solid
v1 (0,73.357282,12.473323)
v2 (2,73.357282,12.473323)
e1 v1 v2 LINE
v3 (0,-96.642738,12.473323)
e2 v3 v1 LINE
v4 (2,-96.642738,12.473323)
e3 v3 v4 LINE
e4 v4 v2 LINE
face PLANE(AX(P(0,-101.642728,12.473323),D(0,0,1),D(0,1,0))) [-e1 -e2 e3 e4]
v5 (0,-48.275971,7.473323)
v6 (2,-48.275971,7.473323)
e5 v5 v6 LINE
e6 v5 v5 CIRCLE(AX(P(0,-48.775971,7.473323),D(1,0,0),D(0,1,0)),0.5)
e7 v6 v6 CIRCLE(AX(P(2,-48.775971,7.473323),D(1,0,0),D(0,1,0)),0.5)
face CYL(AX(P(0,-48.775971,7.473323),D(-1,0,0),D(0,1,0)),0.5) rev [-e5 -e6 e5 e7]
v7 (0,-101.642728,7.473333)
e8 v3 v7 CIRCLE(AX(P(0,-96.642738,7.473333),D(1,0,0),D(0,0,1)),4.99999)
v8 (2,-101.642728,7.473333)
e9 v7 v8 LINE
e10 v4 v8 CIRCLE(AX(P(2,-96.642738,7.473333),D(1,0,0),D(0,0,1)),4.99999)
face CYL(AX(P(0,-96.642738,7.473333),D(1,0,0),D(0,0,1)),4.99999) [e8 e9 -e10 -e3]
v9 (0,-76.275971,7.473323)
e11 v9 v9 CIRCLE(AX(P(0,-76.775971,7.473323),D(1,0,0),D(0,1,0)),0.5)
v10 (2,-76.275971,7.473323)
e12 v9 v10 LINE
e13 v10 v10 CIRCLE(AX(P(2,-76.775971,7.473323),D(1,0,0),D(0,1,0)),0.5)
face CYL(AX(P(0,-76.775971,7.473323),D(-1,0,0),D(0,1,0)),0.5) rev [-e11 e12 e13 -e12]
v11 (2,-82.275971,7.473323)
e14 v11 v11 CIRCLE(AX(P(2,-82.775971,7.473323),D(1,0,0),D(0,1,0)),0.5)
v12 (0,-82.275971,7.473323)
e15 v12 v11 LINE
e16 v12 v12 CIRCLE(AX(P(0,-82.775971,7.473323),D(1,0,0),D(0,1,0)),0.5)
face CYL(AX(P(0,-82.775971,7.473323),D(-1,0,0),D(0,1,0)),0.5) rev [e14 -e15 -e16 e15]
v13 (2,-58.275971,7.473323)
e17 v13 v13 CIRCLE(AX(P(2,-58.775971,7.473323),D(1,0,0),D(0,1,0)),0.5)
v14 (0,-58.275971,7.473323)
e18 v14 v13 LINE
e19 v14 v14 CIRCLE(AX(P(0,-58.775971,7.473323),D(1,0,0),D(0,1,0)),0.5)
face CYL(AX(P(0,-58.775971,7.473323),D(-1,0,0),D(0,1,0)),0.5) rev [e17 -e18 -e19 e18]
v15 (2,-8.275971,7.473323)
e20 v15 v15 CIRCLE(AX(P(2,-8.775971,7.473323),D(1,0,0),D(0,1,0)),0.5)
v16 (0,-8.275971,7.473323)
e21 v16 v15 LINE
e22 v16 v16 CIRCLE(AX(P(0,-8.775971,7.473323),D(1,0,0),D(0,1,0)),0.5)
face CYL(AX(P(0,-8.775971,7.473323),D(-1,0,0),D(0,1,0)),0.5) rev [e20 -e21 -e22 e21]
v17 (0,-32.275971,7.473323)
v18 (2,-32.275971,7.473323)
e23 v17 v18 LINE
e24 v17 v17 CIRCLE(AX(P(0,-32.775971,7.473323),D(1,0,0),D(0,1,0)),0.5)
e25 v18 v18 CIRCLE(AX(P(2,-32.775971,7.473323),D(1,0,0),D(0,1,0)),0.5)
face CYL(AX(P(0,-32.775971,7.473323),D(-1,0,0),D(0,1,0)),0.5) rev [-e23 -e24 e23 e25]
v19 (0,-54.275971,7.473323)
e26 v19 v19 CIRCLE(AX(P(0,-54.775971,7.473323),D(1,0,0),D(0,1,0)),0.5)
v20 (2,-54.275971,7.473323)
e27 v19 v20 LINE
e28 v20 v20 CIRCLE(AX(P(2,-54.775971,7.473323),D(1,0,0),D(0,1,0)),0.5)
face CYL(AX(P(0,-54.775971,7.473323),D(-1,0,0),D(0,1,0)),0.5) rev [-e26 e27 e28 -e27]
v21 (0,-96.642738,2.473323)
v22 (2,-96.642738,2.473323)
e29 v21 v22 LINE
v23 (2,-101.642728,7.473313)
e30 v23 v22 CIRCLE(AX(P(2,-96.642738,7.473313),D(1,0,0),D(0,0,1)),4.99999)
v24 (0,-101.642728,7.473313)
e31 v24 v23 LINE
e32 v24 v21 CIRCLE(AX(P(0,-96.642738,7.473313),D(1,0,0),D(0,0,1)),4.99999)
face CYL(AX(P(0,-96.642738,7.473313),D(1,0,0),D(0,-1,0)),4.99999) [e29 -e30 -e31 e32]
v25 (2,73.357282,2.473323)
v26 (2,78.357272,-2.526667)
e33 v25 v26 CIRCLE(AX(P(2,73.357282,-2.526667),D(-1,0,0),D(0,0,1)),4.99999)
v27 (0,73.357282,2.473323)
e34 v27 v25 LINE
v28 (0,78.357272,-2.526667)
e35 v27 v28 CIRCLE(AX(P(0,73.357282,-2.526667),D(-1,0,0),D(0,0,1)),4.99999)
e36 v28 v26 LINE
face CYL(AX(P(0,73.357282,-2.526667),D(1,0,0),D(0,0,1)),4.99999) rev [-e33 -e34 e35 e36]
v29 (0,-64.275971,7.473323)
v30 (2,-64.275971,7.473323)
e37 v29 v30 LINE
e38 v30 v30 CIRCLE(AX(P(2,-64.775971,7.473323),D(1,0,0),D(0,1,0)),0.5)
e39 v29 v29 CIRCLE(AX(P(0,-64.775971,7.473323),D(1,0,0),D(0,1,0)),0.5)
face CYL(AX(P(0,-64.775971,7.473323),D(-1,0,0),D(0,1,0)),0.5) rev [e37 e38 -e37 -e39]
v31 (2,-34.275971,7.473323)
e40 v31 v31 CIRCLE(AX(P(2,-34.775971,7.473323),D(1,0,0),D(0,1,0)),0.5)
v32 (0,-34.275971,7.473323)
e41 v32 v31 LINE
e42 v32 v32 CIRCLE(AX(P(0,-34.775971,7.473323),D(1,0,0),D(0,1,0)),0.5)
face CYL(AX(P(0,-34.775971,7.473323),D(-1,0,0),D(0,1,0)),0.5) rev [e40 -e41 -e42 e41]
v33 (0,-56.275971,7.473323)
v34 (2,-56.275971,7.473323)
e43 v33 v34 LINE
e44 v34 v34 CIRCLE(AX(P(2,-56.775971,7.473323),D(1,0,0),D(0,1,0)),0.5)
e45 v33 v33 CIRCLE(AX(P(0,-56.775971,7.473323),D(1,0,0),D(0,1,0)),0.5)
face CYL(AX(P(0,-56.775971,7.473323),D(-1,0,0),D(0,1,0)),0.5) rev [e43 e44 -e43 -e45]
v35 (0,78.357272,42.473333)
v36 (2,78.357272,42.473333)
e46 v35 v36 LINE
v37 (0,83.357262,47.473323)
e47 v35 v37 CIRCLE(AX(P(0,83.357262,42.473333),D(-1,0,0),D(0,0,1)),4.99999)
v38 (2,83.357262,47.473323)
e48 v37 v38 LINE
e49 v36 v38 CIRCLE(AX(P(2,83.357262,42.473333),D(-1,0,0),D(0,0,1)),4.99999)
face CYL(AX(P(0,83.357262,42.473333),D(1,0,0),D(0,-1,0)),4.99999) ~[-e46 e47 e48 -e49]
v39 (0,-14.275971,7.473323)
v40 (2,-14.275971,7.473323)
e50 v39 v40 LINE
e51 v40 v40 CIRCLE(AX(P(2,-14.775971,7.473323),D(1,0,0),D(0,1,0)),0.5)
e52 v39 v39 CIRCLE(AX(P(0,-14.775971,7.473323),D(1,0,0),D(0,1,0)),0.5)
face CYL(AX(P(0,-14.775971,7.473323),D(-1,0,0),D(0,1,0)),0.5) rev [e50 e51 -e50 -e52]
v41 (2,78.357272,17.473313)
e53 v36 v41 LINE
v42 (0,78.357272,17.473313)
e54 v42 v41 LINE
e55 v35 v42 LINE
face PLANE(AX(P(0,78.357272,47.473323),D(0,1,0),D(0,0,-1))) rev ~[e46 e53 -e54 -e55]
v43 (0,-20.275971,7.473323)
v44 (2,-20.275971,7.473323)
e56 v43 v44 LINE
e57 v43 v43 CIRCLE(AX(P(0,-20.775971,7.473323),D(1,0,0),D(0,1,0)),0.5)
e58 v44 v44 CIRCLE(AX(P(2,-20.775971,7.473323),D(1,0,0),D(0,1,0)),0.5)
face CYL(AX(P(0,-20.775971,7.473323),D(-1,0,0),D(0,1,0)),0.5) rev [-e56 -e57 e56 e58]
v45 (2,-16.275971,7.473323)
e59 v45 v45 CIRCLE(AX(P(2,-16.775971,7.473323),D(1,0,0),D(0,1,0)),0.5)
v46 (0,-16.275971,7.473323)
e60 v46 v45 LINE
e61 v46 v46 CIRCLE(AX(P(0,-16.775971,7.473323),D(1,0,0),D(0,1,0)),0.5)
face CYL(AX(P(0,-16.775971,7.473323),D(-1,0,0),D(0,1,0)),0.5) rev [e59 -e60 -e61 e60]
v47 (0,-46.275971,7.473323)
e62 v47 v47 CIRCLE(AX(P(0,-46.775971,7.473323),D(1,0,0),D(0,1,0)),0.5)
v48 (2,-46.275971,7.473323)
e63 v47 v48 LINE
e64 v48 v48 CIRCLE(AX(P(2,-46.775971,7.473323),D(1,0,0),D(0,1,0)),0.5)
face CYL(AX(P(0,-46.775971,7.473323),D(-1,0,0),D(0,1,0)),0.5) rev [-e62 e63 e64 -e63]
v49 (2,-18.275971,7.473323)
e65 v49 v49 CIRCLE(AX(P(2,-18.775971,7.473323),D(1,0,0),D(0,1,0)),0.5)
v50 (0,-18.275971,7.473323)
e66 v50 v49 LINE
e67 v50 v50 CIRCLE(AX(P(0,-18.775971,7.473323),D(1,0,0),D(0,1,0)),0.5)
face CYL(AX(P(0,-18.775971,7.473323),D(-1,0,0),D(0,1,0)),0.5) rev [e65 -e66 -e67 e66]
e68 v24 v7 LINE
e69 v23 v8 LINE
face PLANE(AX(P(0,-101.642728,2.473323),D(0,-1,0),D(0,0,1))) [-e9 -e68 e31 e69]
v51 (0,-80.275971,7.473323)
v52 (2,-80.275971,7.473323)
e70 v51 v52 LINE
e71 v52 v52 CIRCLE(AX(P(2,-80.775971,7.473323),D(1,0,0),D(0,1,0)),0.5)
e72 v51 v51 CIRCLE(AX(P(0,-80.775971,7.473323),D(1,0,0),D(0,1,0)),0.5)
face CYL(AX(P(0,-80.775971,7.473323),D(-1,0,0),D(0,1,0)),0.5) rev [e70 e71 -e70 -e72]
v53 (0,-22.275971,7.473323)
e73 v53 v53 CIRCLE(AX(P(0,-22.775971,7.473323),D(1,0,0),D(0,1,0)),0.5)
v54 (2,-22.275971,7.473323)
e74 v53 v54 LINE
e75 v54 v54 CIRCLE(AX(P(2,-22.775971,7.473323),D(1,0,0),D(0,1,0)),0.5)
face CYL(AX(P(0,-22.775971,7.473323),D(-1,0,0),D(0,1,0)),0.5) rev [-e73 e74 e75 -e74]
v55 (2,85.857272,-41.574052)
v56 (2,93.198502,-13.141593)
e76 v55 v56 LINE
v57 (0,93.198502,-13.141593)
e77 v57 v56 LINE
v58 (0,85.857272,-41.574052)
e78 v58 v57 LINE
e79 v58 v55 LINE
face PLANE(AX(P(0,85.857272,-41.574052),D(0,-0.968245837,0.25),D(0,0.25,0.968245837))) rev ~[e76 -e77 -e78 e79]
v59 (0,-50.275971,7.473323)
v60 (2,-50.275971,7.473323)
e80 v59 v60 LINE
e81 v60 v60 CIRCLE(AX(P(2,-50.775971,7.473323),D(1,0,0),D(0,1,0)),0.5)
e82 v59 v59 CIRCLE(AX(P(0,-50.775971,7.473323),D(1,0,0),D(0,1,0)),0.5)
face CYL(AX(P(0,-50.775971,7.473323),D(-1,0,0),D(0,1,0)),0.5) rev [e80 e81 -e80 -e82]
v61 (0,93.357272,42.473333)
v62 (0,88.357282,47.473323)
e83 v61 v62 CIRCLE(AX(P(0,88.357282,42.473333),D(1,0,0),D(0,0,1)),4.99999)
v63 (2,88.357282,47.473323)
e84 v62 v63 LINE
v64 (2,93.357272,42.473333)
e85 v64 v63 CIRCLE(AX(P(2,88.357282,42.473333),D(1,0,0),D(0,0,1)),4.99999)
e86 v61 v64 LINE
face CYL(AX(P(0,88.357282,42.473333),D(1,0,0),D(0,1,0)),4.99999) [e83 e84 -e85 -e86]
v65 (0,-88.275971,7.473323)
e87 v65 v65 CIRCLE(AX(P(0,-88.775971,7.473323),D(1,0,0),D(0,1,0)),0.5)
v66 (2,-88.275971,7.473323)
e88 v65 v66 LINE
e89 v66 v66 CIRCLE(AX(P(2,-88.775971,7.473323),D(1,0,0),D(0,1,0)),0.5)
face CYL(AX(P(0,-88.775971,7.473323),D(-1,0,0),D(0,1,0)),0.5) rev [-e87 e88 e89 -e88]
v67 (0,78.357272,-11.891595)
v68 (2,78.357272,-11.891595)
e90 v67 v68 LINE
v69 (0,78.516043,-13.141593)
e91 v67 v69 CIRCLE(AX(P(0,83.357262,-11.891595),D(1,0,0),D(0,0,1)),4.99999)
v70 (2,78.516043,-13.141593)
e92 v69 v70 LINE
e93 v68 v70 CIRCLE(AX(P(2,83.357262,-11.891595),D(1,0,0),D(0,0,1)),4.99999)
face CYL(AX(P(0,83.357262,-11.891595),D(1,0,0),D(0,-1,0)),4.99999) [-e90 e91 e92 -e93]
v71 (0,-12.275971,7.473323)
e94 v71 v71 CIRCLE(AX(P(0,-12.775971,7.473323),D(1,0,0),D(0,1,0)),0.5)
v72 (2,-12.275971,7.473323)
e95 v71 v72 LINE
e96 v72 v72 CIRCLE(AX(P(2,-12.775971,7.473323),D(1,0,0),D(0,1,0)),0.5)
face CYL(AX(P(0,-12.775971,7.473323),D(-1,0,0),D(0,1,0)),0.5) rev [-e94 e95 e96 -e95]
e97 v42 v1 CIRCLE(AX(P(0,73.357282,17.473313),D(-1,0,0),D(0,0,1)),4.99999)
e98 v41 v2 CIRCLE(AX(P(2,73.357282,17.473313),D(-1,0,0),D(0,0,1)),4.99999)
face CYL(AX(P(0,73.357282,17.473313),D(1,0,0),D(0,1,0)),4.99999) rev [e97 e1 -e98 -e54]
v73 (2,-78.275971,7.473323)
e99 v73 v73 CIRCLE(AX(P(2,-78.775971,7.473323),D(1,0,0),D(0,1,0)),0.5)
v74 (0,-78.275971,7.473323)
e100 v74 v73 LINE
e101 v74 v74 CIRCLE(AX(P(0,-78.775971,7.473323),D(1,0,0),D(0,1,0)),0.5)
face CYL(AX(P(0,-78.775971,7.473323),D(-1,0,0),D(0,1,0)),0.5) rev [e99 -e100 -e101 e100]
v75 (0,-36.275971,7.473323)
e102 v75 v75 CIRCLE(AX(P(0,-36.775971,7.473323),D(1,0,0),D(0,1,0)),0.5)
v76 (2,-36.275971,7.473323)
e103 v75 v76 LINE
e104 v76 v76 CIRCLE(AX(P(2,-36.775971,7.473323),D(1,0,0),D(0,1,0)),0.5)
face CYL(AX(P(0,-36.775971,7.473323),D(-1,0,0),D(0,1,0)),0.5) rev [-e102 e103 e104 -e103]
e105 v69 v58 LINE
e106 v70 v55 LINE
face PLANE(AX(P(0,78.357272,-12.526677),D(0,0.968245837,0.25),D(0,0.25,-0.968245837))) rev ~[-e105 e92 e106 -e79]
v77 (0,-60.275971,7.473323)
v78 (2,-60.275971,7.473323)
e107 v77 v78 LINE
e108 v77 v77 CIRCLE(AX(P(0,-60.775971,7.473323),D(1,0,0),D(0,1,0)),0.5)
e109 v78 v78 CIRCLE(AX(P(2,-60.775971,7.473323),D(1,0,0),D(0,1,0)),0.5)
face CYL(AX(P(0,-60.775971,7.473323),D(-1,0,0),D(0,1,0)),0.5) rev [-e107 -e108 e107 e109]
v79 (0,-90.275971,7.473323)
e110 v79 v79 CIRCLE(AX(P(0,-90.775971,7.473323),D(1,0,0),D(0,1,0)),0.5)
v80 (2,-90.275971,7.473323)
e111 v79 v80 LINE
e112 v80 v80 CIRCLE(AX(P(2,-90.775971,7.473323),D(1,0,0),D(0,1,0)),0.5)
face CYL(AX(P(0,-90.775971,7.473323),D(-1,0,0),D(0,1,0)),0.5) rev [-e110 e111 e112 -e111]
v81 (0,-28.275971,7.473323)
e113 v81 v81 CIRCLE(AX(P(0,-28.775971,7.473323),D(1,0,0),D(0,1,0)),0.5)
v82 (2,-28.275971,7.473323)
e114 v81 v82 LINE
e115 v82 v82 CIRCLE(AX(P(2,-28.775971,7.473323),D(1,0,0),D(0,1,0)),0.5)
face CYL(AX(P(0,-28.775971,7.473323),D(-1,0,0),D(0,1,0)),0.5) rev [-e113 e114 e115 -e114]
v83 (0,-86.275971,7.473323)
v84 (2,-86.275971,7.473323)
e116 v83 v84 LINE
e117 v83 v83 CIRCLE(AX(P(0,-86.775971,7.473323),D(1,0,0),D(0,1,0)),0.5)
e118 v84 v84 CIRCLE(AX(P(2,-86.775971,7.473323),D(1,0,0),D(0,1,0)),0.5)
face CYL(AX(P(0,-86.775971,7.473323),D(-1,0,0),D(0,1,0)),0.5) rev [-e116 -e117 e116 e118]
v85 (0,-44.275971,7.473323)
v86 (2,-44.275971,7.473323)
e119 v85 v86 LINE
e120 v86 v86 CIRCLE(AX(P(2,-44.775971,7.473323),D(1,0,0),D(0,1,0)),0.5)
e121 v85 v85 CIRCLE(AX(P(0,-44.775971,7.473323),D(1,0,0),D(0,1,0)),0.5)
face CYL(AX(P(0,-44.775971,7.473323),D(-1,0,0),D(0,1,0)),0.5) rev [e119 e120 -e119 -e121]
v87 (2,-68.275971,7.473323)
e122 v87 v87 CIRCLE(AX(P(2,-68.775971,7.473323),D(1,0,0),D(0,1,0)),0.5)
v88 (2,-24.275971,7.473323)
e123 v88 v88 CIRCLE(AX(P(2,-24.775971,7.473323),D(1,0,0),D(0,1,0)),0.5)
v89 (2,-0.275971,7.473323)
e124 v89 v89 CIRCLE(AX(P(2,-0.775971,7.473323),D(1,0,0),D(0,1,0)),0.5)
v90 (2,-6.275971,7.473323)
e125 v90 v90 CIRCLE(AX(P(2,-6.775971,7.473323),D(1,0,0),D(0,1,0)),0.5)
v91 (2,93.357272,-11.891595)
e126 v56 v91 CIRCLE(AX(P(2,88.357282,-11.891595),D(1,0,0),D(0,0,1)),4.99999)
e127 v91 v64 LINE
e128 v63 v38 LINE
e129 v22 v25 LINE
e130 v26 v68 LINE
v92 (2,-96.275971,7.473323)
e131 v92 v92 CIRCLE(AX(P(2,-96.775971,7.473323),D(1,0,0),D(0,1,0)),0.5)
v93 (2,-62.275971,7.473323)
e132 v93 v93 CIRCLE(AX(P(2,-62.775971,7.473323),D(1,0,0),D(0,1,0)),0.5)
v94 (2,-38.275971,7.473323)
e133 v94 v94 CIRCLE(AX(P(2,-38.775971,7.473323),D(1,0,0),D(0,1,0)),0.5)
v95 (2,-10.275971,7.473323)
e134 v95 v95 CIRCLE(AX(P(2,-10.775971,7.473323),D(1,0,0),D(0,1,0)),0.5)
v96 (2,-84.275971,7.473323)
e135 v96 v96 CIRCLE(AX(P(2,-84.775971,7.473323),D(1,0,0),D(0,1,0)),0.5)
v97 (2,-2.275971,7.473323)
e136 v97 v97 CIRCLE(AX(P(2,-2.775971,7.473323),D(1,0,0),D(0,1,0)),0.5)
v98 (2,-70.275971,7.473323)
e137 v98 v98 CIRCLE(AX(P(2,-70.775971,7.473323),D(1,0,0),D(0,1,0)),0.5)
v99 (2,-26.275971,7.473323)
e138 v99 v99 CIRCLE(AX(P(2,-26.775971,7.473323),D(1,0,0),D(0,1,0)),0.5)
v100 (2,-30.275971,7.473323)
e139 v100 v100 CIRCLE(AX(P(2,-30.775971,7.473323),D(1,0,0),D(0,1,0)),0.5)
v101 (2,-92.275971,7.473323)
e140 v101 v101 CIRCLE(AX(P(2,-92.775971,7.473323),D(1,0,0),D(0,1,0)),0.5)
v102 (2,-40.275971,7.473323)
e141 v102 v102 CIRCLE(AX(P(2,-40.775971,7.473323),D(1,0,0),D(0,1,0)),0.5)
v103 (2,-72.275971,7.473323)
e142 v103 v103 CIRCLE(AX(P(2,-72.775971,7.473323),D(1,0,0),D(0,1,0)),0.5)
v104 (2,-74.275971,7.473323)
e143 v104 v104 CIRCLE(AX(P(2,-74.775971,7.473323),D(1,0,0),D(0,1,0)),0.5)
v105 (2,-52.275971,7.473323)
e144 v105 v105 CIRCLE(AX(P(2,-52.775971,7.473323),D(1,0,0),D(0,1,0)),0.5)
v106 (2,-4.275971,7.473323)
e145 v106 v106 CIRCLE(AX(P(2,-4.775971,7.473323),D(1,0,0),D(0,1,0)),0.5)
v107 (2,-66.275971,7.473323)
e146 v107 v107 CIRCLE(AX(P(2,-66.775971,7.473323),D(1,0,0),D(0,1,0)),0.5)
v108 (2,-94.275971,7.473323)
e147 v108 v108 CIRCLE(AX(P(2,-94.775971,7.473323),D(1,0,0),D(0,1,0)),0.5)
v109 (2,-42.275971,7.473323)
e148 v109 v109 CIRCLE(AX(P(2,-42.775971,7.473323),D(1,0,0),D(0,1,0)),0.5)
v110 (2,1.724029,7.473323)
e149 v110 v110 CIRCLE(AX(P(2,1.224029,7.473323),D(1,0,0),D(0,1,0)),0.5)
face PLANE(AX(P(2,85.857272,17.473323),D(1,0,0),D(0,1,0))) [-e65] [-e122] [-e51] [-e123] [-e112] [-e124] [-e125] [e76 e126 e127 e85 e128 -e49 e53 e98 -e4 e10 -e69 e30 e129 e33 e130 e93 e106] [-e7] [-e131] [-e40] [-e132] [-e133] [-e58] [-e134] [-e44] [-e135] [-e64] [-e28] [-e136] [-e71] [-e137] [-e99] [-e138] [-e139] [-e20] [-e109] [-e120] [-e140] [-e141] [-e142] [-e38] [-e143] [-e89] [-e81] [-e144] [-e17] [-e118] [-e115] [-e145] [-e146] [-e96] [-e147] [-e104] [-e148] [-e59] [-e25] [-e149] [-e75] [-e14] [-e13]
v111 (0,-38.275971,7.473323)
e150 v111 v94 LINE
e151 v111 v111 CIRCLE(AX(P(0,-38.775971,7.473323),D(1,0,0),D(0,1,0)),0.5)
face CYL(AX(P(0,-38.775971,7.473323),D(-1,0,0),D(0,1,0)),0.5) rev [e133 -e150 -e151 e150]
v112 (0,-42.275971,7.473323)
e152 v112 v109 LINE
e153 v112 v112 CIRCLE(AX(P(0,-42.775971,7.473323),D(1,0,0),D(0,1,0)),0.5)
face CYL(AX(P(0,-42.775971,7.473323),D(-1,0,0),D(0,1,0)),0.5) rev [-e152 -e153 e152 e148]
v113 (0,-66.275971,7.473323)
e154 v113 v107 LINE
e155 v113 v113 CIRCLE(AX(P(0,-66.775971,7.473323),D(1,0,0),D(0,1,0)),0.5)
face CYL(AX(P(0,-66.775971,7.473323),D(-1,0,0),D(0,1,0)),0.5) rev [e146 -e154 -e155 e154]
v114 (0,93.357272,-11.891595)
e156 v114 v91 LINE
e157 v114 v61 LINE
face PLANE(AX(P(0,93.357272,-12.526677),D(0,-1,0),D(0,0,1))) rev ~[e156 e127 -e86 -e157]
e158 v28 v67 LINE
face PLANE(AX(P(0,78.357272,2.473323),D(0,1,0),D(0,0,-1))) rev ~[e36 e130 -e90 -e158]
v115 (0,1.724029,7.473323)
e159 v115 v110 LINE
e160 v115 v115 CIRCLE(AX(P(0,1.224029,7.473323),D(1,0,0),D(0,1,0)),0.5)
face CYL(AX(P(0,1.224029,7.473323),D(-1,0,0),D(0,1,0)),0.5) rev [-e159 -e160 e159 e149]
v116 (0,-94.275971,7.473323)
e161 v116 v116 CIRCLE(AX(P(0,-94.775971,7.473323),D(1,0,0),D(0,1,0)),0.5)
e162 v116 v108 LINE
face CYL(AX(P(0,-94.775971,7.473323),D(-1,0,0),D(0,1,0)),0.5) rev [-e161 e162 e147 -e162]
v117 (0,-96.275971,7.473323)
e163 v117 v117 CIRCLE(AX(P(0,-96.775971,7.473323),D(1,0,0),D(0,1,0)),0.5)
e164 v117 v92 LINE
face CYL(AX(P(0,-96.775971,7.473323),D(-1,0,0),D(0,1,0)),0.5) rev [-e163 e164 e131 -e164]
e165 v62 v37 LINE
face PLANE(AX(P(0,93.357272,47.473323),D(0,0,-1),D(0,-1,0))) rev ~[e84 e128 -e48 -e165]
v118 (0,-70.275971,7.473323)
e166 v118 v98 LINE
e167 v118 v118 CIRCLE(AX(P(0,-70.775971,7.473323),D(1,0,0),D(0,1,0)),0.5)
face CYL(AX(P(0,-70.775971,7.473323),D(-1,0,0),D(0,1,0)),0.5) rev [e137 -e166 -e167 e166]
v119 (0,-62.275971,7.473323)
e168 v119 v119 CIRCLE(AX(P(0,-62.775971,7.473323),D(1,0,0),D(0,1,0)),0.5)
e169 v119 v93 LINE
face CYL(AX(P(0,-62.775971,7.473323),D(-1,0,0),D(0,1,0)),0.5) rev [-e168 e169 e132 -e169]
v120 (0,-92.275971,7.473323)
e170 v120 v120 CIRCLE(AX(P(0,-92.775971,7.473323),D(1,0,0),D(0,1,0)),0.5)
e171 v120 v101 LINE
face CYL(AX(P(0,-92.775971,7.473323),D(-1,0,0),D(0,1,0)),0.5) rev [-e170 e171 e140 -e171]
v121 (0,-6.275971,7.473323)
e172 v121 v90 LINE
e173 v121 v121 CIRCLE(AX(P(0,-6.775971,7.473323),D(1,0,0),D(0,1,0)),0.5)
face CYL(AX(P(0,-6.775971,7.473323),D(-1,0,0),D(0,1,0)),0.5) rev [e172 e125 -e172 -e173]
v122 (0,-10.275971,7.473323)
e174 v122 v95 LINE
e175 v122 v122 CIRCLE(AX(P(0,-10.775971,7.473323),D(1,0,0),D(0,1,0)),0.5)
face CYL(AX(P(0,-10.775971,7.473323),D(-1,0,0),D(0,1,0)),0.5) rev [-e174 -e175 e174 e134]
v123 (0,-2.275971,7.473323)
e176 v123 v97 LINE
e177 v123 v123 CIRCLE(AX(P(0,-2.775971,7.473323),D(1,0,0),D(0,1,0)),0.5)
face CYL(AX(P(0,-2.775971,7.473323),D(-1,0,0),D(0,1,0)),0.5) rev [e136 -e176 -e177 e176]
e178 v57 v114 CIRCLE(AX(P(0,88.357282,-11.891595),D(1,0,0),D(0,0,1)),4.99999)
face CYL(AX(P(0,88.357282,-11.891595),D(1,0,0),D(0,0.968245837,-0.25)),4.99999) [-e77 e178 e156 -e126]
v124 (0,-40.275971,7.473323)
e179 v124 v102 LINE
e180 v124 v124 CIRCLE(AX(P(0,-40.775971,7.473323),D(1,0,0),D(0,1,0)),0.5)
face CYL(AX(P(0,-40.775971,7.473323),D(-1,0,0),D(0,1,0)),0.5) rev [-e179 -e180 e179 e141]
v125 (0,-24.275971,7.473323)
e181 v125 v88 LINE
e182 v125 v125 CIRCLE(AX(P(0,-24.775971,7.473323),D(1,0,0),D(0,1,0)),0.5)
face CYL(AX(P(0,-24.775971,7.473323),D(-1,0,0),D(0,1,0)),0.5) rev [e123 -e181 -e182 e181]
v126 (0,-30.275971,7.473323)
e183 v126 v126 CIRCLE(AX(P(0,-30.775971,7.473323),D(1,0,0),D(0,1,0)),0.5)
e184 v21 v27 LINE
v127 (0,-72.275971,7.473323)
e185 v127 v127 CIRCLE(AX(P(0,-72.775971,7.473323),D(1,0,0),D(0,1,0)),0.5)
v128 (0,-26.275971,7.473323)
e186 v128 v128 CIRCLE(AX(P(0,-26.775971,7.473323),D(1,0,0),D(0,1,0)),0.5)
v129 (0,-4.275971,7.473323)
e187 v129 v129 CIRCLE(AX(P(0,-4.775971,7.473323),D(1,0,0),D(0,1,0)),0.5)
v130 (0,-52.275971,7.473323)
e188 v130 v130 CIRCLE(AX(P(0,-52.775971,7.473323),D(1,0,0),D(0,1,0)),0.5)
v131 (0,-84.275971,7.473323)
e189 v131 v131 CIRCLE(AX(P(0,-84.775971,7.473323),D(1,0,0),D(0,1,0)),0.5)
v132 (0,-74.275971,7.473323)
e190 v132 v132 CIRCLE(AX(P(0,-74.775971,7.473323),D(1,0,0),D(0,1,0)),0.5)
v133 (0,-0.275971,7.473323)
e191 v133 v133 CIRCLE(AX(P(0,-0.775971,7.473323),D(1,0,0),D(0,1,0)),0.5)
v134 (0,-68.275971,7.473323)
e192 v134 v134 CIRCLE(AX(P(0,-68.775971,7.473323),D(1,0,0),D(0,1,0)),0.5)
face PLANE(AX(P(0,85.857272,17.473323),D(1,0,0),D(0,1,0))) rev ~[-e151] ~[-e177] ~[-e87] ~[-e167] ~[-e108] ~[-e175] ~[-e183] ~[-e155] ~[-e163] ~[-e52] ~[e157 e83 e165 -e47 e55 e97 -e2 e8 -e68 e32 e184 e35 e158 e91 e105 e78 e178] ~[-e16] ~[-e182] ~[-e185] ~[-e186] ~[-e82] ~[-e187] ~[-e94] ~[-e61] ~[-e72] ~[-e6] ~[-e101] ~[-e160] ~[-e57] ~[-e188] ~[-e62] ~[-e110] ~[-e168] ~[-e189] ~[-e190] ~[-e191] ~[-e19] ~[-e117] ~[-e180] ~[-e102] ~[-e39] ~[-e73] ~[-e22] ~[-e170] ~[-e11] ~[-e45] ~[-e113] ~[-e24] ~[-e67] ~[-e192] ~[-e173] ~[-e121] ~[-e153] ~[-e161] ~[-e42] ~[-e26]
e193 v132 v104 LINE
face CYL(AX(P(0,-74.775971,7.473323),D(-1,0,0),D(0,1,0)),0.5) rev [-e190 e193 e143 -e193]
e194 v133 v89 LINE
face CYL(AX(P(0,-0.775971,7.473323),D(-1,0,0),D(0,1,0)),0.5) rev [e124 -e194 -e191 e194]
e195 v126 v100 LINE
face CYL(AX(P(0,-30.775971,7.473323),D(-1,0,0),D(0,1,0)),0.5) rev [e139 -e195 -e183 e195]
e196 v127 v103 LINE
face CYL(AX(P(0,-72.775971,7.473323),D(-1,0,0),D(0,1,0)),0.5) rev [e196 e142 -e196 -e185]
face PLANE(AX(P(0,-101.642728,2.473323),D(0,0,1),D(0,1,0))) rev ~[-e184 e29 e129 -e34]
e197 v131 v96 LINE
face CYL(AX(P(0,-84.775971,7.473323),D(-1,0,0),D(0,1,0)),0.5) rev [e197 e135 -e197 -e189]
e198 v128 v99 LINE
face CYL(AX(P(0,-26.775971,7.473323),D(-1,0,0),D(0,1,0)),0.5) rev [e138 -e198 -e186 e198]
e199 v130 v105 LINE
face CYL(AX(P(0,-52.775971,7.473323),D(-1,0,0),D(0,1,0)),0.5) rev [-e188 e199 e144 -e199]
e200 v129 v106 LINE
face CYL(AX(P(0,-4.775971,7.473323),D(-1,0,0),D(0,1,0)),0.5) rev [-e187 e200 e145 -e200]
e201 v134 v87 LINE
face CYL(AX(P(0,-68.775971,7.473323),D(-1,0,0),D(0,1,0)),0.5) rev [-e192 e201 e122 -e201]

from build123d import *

# Parameters (mm, degrees)
F0_W     = 180
F0_H     = 10
F0_R     = 0.5
F1_DEPTH = 2
F2_R     = 4.99999


# Not quite as in the source:
# - a fillet or chamfer is up to 0.001 mm smaller than in the source, because OpenCascade refuses the exact size


with BuildPart() as f1:
    # F0 (on Right) → F1 (new body)
    with BuildSketch(Plane.YZ):
        Polygon((78.3572724922, 47.473322805), (78.3572724922, 12.473322805), (78.3572724922, 2.473322805), (78.3572724922, -12.526677195), (93.3572724922, -12.526677195), (93.3572724922, 47.473322805), align=None)
        with Locations((-11.6427275078, 7.473322805)):
            Rectangle(F0_W, F0_H)
        with Locations((-96.7759713531, 7.473322805)):
            Circle(F0_R, mode=Mode.SUBTRACT)
        with Locations((-94.7759713531, 7.473322805)):
            Circle(F0_R, mode=Mode.SUBTRACT)
        with Locations((-92.7759713531, 7.473322805)):
            Circle(F0_R, mode=Mode.SUBTRACT)
        with Locations((-90.7759713531, 7.473322805)):
            Circle(F0_R, mode=Mode.SUBTRACT)
        with Locations((-88.7759713531, 7.473322805)):
            Circle(F0_R, mode=Mode.SUBTRACT)
        with Locations((-86.7759713531, 7.473322805)):
            Circle(F0_R, mode=Mode.SUBTRACT)
        with Locations((-84.7759713531, 7.473322805)):
            Circle(F0_R, mode=Mode.SUBTRACT)
        with Locations((-82.7759713531, 7.473322805)):
            Circle(F0_R, mode=Mode.SUBTRACT)
        with Locations((-80.7759713531, 7.473322805)):
            Circle(F0_R, mode=Mode.SUBTRACT)
        with Locations((-78.7759713531, 7.473322805)):
            Circle(F0_R, mode=Mode.SUBTRACT)
        with Locations((-76.7759713531, 7.473322805)):
            Circle(F0_R, mode=Mode.SUBTRACT)
        with Locations((-74.7759713531, 7.473322805)):
            Circle(F0_R, mode=Mode.SUBTRACT)
        with Locations((-72.7759713531, 7.473322805)):
            Circle(F0_R, mode=Mode.SUBTRACT)
        with Locations((-70.7759713531, 7.473322805)):
            Circle(F0_R, mode=Mode.SUBTRACT)
        with Locations((-68.7759713531, 7.473322805)):
            Circle(F0_R, mode=Mode.SUBTRACT)
        with Locations((-66.7759713531, 7.473322805)):
            Circle(F0_R, mode=Mode.SUBTRACT)
        with Locations((-64.7759713531, 7.473322805)):
            Circle(F0_R, mode=Mode.SUBTRACT)
        with Locations((-62.7759713531, 7.473322805)):
            Circle(F0_R, mode=Mode.SUBTRACT)
        with Locations((-60.7759713531, 7.473322805)):
            Circle(F0_R, mode=Mode.SUBTRACT)
        with Locations((-58.7759713531, 7.473322805)):
            Circle(F0_R, mode=Mode.SUBTRACT)
        with Locations((-56.7759713531, 7.473322805)):
            Circle(F0_R, mode=Mode.SUBTRACT)
        with Locations((-54.7759713531, 7.473322805)):
            Circle(F0_R, mode=Mode.SUBTRACT)
        with Locations((-52.7759713531, 7.473322805)):
            Circle(F0_R, mode=Mode.SUBTRACT)
        with Locations((-50.7759713531, 7.473322805)):
            Circle(F0_R, mode=Mode.SUBTRACT)
        with Locations((-48.7759713531, 7.473322805)):
            Circle(F0_R, mode=Mode.SUBTRACT)
        with Locations((-46.7759713531, 7.473322805)):
            Circle(F0_R, mode=Mode.SUBTRACT)
        with Locations((-44.7759713531, 7.473322805)):
            Circle(F0_R, mode=Mode.SUBTRACT)
        with Locations((-42.7759713531, 7.473322805)):
            Circle(F0_R, mode=Mode.SUBTRACT)
        with Locations((-40.7759713531, 7.473322805)):
            Circle(F0_R, mode=Mode.SUBTRACT)
        with Locations((-38.7759713531, 7.473322805)):
            Circle(F0_R, mode=Mode.SUBTRACT)
        with Locations((-36.7759713531, 7.473322805)):
            Circle(F0_R, mode=Mode.SUBTRACT)
        with Locations((-34.7759713531, 7.473322805)):
            Circle(F0_R, mode=Mode.SUBTRACT)
        with Locations((-32.7759713531, 7.473322805)):
            Circle(F0_R, mode=Mode.SUBTRACT)
        with Locations((-30.7759713531, 7.473322805)):
            Circle(F0_R, mode=Mode.SUBTRACT)
        with Locations((-28.7759713531, 7.473322805)):
            Circle(F0_R, mode=Mode.SUBTRACT)
        with Locations((-26.7759713531, 7.473322805)):
            Circle(F0_R, mode=Mode.SUBTRACT)
        with Locations((-24.7759713531, 7.473322805)):
            Circle(F0_R, mode=Mode.SUBTRACT)
        with Locations((-22.7759713531, 7.473322805)):
            Circle(F0_R, mode=Mode.SUBTRACT)
        with Locations((-20.7759713531, 7.473322805)):
            Circle(F0_R, mode=Mode.SUBTRACT)
        with Locations((-18.7759713531, 7.473322805)):
            Circle(F0_R, mode=Mode.SUBTRACT)
        with Locations((-16.7759713531, 7.473322805)):
            Circle(F0_R, mode=Mode.SUBTRACT)
        with Locations((-14.7759713531, 7.473322805)):
            Circle(F0_R, mode=Mode.SUBTRACT)
        with Locations((-12.7759713531, 7.473322805)):
            Circle(F0_R, mode=Mode.SUBTRACT)
        with Locations((-10.7759713531, 7.473322805)):
            Circle(F0_R, mode=Mode.SUBTRACT)
        with Locations((-8.7759713531, 7.473322805)):
            Circle(F0_R, mode=Mode.SUBTRACT)
        with Locations((-6.7759713531, 7.473322805)):
            Circle(F0_R, mode=Mode.SUBTRACT)
        with Locations((-4.7759713531, 7.473322805)):
            Circle(F0_R, mode=Mode.SUBTRACT)
        with Locations((-2.7759713531, 7.473322805)):
            Circle(F0_R, mode=Mode.SUBTRACT)
        with Locations((-0.7759713531, 7.473322805)):
            Circle(F0_R, mode=Mode.SUBTRACT)
        with Locations((1.2240286469, 7.473322805)):
            Circle(F0_R, mode=Mode.SUBTRACT)
        Polygon((93.3572724922, -12.526677195), (78.3572724922, -12.526677195), (85.8572724922, -41.5740522915), align=None)
    extrude(amount=F1_DEPTH)

    # F2 (radius 5 in the source; OpenCascade refuses exactly that, so slightly less here)
    f2_edges = [f1.edges().sort_by_distance(p)[0] for p in [
        (1, 93.357272, 47.473323),
        (1, 78.357272, 47.473323),
        (1, 78.357272, 12.473323),
        (1, 78.357272, 2.473323),
        (1, 78.357272, -12.526677),
        (1, 93.357272, -12.526677),
        (1, -101.642728, 12.473323),
        (1, -101.642728, 2.473323),
    ]]
    fillet(f2_edges, radius=F2_R)


solid = f1.part
